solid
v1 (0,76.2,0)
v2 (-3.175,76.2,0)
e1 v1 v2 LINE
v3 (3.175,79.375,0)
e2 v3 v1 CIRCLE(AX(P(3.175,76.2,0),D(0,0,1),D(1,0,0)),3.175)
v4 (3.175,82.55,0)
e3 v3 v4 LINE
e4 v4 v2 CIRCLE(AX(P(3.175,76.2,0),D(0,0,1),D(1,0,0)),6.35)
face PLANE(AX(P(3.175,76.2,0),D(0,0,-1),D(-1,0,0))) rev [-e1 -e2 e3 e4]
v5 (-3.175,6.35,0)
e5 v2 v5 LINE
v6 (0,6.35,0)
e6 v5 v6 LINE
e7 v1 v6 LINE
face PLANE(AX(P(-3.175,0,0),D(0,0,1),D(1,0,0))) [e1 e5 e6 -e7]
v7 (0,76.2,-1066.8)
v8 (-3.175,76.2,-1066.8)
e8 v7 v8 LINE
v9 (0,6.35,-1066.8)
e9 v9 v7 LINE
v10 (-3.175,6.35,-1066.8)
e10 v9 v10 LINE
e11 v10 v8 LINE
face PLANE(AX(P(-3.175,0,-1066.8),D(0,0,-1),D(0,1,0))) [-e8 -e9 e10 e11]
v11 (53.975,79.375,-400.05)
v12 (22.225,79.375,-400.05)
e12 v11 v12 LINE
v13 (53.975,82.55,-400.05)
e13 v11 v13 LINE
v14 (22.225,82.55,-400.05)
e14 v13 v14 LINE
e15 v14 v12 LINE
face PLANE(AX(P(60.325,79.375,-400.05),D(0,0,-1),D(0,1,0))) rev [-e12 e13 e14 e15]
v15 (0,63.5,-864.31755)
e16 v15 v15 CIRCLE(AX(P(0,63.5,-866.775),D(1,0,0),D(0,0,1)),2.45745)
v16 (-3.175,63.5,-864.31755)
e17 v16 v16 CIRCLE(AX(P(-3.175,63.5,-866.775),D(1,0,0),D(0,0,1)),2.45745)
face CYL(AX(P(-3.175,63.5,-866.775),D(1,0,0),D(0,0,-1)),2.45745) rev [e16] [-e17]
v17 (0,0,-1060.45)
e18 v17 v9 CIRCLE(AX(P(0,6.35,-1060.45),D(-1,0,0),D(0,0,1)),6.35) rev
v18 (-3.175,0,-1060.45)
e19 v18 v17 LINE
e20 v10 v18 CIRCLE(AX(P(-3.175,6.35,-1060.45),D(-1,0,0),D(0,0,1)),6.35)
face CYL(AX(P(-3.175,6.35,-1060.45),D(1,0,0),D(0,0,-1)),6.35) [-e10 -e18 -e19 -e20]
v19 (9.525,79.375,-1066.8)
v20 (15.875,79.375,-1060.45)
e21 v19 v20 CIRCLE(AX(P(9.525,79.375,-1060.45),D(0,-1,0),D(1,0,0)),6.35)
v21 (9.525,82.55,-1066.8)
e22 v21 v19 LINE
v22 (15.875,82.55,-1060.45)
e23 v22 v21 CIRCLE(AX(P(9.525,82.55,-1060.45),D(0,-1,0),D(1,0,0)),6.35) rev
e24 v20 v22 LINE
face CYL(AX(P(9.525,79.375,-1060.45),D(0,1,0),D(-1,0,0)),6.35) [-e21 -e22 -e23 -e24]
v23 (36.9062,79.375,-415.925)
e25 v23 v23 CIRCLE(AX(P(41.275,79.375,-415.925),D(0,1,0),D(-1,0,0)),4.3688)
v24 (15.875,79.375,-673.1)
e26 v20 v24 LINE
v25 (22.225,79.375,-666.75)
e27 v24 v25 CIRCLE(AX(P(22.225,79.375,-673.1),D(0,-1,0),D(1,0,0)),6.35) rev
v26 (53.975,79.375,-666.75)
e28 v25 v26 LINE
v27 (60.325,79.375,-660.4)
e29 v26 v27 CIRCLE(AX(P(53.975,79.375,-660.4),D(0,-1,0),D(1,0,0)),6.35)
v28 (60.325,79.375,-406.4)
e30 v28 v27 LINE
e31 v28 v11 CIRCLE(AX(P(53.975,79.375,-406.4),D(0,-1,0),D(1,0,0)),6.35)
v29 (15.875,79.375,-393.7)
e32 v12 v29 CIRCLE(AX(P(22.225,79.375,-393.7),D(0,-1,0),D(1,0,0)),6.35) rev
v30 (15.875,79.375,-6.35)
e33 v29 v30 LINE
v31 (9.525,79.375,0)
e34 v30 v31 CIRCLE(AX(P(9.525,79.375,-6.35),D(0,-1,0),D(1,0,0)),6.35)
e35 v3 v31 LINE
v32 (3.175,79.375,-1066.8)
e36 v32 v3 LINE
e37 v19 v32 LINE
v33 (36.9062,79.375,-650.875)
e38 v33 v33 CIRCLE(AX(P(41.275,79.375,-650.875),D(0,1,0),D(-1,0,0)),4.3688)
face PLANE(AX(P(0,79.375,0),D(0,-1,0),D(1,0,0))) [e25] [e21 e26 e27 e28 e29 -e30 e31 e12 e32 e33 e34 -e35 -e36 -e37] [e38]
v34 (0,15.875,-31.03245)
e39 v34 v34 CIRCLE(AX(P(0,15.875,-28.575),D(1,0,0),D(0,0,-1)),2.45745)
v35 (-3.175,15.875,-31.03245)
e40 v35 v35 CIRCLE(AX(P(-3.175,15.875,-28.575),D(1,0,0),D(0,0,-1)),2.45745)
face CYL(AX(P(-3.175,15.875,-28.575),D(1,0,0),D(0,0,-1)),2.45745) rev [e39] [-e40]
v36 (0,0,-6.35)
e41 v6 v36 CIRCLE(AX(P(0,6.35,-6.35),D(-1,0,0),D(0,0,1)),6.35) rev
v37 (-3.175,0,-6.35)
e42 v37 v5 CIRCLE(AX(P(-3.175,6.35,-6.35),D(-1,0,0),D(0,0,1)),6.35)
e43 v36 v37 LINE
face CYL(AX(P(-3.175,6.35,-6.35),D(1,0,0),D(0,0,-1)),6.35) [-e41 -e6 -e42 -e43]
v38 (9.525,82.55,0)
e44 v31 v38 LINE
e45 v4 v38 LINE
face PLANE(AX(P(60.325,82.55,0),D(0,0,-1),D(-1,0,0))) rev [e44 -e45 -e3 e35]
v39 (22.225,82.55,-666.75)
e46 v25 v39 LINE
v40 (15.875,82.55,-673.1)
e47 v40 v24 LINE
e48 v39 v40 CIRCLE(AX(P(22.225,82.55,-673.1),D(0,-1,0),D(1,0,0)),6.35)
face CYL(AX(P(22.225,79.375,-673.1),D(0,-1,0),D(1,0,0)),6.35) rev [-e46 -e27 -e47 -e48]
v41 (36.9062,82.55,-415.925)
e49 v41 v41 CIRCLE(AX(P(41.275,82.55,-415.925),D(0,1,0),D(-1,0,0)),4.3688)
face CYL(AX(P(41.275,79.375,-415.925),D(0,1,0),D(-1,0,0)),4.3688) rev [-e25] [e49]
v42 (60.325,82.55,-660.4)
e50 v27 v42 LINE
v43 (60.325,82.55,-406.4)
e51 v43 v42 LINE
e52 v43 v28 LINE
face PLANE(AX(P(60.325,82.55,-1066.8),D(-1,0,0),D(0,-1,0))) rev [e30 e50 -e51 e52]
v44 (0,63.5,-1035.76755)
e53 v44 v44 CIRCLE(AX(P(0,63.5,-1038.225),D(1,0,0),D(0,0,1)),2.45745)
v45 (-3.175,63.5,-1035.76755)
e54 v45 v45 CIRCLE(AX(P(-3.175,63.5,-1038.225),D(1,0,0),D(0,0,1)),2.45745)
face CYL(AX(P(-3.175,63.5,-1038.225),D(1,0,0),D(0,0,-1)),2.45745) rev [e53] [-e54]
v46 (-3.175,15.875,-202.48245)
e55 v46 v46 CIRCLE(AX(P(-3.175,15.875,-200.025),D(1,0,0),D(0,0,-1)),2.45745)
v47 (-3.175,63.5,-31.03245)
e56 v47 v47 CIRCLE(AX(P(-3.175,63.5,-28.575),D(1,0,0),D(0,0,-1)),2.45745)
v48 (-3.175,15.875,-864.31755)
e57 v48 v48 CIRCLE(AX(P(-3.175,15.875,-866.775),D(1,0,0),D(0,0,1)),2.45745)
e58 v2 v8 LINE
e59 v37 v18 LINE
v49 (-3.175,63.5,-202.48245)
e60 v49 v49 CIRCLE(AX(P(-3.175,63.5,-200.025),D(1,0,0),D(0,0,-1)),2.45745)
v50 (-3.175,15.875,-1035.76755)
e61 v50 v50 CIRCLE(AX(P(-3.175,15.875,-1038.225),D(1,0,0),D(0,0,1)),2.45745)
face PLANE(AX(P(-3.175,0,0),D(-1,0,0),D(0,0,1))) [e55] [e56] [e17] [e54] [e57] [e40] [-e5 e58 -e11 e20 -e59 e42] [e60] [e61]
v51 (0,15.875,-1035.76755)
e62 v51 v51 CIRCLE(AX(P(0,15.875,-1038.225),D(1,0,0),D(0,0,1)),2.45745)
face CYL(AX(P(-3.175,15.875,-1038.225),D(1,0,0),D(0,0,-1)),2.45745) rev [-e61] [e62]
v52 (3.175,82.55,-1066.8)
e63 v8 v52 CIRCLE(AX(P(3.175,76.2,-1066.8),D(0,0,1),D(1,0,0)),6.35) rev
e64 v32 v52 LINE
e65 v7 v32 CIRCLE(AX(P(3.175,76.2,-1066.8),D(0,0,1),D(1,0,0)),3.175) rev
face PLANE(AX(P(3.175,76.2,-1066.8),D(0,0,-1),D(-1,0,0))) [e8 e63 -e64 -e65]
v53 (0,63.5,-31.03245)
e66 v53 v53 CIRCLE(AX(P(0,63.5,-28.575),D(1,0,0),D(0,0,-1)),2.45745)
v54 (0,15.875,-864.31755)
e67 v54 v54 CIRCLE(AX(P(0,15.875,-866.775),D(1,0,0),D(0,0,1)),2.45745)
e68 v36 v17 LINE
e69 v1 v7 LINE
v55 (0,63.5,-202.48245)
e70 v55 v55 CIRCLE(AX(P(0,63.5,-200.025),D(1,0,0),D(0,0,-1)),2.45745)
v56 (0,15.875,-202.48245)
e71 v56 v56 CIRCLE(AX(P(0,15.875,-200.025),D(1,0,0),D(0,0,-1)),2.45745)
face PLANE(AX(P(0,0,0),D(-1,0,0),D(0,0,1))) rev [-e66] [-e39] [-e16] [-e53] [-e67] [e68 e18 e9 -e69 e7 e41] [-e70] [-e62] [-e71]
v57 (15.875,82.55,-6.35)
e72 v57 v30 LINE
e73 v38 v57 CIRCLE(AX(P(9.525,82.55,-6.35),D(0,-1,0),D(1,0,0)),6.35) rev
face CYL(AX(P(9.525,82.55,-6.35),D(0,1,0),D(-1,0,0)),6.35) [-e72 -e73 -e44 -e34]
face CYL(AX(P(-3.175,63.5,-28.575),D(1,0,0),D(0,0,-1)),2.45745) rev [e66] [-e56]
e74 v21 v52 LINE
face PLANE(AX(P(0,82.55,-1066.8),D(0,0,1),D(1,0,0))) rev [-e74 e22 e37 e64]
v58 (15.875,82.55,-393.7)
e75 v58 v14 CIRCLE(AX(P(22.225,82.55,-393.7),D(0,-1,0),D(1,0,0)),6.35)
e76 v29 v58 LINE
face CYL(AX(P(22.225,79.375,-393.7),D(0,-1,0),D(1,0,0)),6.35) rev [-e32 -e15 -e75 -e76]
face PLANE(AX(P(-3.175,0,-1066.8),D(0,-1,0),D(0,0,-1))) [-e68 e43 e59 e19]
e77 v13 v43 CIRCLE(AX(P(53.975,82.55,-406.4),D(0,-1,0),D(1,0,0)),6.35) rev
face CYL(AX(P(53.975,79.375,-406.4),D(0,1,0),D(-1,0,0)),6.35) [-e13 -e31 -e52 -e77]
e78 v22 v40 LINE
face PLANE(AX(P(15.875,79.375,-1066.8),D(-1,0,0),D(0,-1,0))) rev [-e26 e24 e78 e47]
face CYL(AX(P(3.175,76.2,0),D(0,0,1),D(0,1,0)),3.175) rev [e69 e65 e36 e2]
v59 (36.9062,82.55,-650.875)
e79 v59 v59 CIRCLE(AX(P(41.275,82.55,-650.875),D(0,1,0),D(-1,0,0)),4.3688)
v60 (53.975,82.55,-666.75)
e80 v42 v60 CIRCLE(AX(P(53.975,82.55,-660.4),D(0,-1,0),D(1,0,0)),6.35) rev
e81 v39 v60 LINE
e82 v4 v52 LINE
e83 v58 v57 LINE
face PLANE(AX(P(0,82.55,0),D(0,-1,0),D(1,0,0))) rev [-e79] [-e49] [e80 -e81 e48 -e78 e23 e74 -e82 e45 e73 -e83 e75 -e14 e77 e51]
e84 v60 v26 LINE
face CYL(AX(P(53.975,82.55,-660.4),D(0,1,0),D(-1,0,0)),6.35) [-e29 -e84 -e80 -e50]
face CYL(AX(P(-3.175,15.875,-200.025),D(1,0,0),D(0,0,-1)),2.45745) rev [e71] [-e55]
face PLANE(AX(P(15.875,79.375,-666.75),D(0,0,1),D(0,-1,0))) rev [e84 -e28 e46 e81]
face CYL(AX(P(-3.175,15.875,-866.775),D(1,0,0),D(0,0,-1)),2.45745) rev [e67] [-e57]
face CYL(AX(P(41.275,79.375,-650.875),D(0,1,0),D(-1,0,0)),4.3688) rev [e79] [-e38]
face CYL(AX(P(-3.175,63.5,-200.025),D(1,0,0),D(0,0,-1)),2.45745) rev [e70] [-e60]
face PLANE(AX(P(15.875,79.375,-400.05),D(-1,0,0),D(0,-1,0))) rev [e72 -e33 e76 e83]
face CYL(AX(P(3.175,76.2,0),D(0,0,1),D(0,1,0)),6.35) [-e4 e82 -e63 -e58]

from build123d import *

# Parameters (mm, degrees)
SKETCH1_W                    = 1066.8
SKETCH1_H                    = 82.55
BASE_FLANGE1_DEPTH           = 3.175
EDGE_FLANGE1_STRIP_W         = 19.05
EDGE_FLANGE1_STRIP_H         = 3.175
EDGE_FLANGE1_STRIP_CUT_DEPTH = 1066.8
EDGE_FLANGE1_DEPTH           = 1066.8
SKETCH9_R                    = 2.45745
CUT_EXTRUDE1_DEPTH           = 1072.688316688
SKETCH10_R                   = 4.3688
CUT_EXTRUDE2_DEPTH           = 3.175
FILLET1_R                    = 6.35


# Sheet-metal steps are written as plain solids
with BuildPart() as part:
    # Sketch1 → Base-Flange1 (new body)
    with BuildSketch(Plane(origin=(0, 0, 0), x_dir=(0, 0, -1), z_dir=(1, 0, 0))):
        with Locations((533.4, 41.275)):
            Rectangle(SKETCH1_W, SKETCH1_H)
    extrude(amount=-BASE_FLANGE1_DEPTH)

    # Edge-Flange1 strip (across the edge) → Edge-Flange1 strip cut (cut)
    with BuildSketch(Plane(origin=(0, 82.55, -1066.8), x_dir=(0, -1, 0), z_dir=(0, 0, 1))):
        with Locations((-3.175, -1.5875)):
            Rectangle(EDGE_FLANGE1_STRIP_W, EDGE_FLANGE1_STRIP_H)
    extrude(amount=EDGE_FLANGE1_STRIP_CUT_DEPTH, mode=Mode.SUBTRACT)

    # Edge-Flange1 section (across the edge) → Edge-Flange1 (add)
    with BuildSketch(Plane(origin=(0, 82.55, -1066.8), x_dir=(0, -1, 0), z_dir=(0, 0, 1))):
        with BuildLine():
            Line((0, 3.175), (0, 60.325))
            Line((0, 60.325), (3.175, 60.325))
            Line((3.175, 60.325), (3.175, 3.175))
            ThreePointArc((3.175, 3.175), (4.10493597, 0.92993597), (6.35, 0))
            Line((6.35, 0), (6.35, -3.175))
            ThreePointArc((6.35, -3.175), (1.859871939, -1.315128061), (0, 3.175))
        make_face()
    extrude(amount=EDGE_FLANGE1_DEPTH)

    # Sketch9 → Cut-Extrude1 (cut, through all)
    with BuildSketch(Plane(origin=(0, 0, 0), x_dir=(0, 0, -1), z_dir=(1, 0, 0))):
        with Locations((28.575, 63.5)):
            Circle(SKETCH9_R)
        with Locations((200.025, 63.5)):
            Circle(SKETCH9_R)
        with Locations((28.575, 15.875)):
            Circle(SKETCH9_R)
        with Locations((200.025, 15.875)):
            Circle(SKETCH9_R)
        with Locations(Location((866.775, 63.5, 0), (0, 0, 180))):
            Circle(SKETCH9_R)
        with Locations(Location((866.775, 15.875, 0), (0, 0, 180))):
            Circle(SKETCH9_R)
        with Locations(Location((1038.225, 15.875, 0), (0, 0, 180))):
            Circle(SKETCH9_R)
        with Locations(Location((1038.225, 63.5, 0), (0, 0, 180))):
            Circle(SKETCH9_R)
    extrude(amount=-CUT_EXTRUDE1_DEPTH, mode=Mode.SUBTRACT)

    # Sketch10 → Cut-Extrude2 (cut)
    with BuildSketch(Plane(origin=(0, 82.55, 0), x_dir=(1, 0, 0), z_dir=(0, 1, 0))):
        with Locations(Location((41.275, 650.875, 0), (0, 0, 180))):
            Circle(SKETCH10_R)
        with Locations(Location((41.275, 415.925, 0), (0, 0, 180))):
            Circle(SKETCH10_R)
        Polygon((15.875, 1066.8), (79.375, 1066.8), (79.375, 0), (15.875, 0), (15.875, 400.05), (60.325, 400.05), (60.325, 666.75), (15.875, 666.75), align=None)
    extrude(amount=-CUT_EXTRUDE2_DEPTH, mode=Mode.SUBTRACT)

    # Fillet1
    fillet1_edges = [part.edges().sort_by_distance(p)[0] for p in [
        (15.875, 80.9625, -1066.8),
        (15.875, 80.9625, -666.75),
        (15.875, 80.9625, 0),
        (15.875, 80.9625, -400.05),
        (60.325, 80.9625, -400.05),
        (60.325, 80.9625, -666.75),
        (-1.5875, 0, 0),
        (-1.5875, 0, -1066.8),
    ]]
    fillet(fillet1_edges, radius=FILLET1_R)


solid = part.part
